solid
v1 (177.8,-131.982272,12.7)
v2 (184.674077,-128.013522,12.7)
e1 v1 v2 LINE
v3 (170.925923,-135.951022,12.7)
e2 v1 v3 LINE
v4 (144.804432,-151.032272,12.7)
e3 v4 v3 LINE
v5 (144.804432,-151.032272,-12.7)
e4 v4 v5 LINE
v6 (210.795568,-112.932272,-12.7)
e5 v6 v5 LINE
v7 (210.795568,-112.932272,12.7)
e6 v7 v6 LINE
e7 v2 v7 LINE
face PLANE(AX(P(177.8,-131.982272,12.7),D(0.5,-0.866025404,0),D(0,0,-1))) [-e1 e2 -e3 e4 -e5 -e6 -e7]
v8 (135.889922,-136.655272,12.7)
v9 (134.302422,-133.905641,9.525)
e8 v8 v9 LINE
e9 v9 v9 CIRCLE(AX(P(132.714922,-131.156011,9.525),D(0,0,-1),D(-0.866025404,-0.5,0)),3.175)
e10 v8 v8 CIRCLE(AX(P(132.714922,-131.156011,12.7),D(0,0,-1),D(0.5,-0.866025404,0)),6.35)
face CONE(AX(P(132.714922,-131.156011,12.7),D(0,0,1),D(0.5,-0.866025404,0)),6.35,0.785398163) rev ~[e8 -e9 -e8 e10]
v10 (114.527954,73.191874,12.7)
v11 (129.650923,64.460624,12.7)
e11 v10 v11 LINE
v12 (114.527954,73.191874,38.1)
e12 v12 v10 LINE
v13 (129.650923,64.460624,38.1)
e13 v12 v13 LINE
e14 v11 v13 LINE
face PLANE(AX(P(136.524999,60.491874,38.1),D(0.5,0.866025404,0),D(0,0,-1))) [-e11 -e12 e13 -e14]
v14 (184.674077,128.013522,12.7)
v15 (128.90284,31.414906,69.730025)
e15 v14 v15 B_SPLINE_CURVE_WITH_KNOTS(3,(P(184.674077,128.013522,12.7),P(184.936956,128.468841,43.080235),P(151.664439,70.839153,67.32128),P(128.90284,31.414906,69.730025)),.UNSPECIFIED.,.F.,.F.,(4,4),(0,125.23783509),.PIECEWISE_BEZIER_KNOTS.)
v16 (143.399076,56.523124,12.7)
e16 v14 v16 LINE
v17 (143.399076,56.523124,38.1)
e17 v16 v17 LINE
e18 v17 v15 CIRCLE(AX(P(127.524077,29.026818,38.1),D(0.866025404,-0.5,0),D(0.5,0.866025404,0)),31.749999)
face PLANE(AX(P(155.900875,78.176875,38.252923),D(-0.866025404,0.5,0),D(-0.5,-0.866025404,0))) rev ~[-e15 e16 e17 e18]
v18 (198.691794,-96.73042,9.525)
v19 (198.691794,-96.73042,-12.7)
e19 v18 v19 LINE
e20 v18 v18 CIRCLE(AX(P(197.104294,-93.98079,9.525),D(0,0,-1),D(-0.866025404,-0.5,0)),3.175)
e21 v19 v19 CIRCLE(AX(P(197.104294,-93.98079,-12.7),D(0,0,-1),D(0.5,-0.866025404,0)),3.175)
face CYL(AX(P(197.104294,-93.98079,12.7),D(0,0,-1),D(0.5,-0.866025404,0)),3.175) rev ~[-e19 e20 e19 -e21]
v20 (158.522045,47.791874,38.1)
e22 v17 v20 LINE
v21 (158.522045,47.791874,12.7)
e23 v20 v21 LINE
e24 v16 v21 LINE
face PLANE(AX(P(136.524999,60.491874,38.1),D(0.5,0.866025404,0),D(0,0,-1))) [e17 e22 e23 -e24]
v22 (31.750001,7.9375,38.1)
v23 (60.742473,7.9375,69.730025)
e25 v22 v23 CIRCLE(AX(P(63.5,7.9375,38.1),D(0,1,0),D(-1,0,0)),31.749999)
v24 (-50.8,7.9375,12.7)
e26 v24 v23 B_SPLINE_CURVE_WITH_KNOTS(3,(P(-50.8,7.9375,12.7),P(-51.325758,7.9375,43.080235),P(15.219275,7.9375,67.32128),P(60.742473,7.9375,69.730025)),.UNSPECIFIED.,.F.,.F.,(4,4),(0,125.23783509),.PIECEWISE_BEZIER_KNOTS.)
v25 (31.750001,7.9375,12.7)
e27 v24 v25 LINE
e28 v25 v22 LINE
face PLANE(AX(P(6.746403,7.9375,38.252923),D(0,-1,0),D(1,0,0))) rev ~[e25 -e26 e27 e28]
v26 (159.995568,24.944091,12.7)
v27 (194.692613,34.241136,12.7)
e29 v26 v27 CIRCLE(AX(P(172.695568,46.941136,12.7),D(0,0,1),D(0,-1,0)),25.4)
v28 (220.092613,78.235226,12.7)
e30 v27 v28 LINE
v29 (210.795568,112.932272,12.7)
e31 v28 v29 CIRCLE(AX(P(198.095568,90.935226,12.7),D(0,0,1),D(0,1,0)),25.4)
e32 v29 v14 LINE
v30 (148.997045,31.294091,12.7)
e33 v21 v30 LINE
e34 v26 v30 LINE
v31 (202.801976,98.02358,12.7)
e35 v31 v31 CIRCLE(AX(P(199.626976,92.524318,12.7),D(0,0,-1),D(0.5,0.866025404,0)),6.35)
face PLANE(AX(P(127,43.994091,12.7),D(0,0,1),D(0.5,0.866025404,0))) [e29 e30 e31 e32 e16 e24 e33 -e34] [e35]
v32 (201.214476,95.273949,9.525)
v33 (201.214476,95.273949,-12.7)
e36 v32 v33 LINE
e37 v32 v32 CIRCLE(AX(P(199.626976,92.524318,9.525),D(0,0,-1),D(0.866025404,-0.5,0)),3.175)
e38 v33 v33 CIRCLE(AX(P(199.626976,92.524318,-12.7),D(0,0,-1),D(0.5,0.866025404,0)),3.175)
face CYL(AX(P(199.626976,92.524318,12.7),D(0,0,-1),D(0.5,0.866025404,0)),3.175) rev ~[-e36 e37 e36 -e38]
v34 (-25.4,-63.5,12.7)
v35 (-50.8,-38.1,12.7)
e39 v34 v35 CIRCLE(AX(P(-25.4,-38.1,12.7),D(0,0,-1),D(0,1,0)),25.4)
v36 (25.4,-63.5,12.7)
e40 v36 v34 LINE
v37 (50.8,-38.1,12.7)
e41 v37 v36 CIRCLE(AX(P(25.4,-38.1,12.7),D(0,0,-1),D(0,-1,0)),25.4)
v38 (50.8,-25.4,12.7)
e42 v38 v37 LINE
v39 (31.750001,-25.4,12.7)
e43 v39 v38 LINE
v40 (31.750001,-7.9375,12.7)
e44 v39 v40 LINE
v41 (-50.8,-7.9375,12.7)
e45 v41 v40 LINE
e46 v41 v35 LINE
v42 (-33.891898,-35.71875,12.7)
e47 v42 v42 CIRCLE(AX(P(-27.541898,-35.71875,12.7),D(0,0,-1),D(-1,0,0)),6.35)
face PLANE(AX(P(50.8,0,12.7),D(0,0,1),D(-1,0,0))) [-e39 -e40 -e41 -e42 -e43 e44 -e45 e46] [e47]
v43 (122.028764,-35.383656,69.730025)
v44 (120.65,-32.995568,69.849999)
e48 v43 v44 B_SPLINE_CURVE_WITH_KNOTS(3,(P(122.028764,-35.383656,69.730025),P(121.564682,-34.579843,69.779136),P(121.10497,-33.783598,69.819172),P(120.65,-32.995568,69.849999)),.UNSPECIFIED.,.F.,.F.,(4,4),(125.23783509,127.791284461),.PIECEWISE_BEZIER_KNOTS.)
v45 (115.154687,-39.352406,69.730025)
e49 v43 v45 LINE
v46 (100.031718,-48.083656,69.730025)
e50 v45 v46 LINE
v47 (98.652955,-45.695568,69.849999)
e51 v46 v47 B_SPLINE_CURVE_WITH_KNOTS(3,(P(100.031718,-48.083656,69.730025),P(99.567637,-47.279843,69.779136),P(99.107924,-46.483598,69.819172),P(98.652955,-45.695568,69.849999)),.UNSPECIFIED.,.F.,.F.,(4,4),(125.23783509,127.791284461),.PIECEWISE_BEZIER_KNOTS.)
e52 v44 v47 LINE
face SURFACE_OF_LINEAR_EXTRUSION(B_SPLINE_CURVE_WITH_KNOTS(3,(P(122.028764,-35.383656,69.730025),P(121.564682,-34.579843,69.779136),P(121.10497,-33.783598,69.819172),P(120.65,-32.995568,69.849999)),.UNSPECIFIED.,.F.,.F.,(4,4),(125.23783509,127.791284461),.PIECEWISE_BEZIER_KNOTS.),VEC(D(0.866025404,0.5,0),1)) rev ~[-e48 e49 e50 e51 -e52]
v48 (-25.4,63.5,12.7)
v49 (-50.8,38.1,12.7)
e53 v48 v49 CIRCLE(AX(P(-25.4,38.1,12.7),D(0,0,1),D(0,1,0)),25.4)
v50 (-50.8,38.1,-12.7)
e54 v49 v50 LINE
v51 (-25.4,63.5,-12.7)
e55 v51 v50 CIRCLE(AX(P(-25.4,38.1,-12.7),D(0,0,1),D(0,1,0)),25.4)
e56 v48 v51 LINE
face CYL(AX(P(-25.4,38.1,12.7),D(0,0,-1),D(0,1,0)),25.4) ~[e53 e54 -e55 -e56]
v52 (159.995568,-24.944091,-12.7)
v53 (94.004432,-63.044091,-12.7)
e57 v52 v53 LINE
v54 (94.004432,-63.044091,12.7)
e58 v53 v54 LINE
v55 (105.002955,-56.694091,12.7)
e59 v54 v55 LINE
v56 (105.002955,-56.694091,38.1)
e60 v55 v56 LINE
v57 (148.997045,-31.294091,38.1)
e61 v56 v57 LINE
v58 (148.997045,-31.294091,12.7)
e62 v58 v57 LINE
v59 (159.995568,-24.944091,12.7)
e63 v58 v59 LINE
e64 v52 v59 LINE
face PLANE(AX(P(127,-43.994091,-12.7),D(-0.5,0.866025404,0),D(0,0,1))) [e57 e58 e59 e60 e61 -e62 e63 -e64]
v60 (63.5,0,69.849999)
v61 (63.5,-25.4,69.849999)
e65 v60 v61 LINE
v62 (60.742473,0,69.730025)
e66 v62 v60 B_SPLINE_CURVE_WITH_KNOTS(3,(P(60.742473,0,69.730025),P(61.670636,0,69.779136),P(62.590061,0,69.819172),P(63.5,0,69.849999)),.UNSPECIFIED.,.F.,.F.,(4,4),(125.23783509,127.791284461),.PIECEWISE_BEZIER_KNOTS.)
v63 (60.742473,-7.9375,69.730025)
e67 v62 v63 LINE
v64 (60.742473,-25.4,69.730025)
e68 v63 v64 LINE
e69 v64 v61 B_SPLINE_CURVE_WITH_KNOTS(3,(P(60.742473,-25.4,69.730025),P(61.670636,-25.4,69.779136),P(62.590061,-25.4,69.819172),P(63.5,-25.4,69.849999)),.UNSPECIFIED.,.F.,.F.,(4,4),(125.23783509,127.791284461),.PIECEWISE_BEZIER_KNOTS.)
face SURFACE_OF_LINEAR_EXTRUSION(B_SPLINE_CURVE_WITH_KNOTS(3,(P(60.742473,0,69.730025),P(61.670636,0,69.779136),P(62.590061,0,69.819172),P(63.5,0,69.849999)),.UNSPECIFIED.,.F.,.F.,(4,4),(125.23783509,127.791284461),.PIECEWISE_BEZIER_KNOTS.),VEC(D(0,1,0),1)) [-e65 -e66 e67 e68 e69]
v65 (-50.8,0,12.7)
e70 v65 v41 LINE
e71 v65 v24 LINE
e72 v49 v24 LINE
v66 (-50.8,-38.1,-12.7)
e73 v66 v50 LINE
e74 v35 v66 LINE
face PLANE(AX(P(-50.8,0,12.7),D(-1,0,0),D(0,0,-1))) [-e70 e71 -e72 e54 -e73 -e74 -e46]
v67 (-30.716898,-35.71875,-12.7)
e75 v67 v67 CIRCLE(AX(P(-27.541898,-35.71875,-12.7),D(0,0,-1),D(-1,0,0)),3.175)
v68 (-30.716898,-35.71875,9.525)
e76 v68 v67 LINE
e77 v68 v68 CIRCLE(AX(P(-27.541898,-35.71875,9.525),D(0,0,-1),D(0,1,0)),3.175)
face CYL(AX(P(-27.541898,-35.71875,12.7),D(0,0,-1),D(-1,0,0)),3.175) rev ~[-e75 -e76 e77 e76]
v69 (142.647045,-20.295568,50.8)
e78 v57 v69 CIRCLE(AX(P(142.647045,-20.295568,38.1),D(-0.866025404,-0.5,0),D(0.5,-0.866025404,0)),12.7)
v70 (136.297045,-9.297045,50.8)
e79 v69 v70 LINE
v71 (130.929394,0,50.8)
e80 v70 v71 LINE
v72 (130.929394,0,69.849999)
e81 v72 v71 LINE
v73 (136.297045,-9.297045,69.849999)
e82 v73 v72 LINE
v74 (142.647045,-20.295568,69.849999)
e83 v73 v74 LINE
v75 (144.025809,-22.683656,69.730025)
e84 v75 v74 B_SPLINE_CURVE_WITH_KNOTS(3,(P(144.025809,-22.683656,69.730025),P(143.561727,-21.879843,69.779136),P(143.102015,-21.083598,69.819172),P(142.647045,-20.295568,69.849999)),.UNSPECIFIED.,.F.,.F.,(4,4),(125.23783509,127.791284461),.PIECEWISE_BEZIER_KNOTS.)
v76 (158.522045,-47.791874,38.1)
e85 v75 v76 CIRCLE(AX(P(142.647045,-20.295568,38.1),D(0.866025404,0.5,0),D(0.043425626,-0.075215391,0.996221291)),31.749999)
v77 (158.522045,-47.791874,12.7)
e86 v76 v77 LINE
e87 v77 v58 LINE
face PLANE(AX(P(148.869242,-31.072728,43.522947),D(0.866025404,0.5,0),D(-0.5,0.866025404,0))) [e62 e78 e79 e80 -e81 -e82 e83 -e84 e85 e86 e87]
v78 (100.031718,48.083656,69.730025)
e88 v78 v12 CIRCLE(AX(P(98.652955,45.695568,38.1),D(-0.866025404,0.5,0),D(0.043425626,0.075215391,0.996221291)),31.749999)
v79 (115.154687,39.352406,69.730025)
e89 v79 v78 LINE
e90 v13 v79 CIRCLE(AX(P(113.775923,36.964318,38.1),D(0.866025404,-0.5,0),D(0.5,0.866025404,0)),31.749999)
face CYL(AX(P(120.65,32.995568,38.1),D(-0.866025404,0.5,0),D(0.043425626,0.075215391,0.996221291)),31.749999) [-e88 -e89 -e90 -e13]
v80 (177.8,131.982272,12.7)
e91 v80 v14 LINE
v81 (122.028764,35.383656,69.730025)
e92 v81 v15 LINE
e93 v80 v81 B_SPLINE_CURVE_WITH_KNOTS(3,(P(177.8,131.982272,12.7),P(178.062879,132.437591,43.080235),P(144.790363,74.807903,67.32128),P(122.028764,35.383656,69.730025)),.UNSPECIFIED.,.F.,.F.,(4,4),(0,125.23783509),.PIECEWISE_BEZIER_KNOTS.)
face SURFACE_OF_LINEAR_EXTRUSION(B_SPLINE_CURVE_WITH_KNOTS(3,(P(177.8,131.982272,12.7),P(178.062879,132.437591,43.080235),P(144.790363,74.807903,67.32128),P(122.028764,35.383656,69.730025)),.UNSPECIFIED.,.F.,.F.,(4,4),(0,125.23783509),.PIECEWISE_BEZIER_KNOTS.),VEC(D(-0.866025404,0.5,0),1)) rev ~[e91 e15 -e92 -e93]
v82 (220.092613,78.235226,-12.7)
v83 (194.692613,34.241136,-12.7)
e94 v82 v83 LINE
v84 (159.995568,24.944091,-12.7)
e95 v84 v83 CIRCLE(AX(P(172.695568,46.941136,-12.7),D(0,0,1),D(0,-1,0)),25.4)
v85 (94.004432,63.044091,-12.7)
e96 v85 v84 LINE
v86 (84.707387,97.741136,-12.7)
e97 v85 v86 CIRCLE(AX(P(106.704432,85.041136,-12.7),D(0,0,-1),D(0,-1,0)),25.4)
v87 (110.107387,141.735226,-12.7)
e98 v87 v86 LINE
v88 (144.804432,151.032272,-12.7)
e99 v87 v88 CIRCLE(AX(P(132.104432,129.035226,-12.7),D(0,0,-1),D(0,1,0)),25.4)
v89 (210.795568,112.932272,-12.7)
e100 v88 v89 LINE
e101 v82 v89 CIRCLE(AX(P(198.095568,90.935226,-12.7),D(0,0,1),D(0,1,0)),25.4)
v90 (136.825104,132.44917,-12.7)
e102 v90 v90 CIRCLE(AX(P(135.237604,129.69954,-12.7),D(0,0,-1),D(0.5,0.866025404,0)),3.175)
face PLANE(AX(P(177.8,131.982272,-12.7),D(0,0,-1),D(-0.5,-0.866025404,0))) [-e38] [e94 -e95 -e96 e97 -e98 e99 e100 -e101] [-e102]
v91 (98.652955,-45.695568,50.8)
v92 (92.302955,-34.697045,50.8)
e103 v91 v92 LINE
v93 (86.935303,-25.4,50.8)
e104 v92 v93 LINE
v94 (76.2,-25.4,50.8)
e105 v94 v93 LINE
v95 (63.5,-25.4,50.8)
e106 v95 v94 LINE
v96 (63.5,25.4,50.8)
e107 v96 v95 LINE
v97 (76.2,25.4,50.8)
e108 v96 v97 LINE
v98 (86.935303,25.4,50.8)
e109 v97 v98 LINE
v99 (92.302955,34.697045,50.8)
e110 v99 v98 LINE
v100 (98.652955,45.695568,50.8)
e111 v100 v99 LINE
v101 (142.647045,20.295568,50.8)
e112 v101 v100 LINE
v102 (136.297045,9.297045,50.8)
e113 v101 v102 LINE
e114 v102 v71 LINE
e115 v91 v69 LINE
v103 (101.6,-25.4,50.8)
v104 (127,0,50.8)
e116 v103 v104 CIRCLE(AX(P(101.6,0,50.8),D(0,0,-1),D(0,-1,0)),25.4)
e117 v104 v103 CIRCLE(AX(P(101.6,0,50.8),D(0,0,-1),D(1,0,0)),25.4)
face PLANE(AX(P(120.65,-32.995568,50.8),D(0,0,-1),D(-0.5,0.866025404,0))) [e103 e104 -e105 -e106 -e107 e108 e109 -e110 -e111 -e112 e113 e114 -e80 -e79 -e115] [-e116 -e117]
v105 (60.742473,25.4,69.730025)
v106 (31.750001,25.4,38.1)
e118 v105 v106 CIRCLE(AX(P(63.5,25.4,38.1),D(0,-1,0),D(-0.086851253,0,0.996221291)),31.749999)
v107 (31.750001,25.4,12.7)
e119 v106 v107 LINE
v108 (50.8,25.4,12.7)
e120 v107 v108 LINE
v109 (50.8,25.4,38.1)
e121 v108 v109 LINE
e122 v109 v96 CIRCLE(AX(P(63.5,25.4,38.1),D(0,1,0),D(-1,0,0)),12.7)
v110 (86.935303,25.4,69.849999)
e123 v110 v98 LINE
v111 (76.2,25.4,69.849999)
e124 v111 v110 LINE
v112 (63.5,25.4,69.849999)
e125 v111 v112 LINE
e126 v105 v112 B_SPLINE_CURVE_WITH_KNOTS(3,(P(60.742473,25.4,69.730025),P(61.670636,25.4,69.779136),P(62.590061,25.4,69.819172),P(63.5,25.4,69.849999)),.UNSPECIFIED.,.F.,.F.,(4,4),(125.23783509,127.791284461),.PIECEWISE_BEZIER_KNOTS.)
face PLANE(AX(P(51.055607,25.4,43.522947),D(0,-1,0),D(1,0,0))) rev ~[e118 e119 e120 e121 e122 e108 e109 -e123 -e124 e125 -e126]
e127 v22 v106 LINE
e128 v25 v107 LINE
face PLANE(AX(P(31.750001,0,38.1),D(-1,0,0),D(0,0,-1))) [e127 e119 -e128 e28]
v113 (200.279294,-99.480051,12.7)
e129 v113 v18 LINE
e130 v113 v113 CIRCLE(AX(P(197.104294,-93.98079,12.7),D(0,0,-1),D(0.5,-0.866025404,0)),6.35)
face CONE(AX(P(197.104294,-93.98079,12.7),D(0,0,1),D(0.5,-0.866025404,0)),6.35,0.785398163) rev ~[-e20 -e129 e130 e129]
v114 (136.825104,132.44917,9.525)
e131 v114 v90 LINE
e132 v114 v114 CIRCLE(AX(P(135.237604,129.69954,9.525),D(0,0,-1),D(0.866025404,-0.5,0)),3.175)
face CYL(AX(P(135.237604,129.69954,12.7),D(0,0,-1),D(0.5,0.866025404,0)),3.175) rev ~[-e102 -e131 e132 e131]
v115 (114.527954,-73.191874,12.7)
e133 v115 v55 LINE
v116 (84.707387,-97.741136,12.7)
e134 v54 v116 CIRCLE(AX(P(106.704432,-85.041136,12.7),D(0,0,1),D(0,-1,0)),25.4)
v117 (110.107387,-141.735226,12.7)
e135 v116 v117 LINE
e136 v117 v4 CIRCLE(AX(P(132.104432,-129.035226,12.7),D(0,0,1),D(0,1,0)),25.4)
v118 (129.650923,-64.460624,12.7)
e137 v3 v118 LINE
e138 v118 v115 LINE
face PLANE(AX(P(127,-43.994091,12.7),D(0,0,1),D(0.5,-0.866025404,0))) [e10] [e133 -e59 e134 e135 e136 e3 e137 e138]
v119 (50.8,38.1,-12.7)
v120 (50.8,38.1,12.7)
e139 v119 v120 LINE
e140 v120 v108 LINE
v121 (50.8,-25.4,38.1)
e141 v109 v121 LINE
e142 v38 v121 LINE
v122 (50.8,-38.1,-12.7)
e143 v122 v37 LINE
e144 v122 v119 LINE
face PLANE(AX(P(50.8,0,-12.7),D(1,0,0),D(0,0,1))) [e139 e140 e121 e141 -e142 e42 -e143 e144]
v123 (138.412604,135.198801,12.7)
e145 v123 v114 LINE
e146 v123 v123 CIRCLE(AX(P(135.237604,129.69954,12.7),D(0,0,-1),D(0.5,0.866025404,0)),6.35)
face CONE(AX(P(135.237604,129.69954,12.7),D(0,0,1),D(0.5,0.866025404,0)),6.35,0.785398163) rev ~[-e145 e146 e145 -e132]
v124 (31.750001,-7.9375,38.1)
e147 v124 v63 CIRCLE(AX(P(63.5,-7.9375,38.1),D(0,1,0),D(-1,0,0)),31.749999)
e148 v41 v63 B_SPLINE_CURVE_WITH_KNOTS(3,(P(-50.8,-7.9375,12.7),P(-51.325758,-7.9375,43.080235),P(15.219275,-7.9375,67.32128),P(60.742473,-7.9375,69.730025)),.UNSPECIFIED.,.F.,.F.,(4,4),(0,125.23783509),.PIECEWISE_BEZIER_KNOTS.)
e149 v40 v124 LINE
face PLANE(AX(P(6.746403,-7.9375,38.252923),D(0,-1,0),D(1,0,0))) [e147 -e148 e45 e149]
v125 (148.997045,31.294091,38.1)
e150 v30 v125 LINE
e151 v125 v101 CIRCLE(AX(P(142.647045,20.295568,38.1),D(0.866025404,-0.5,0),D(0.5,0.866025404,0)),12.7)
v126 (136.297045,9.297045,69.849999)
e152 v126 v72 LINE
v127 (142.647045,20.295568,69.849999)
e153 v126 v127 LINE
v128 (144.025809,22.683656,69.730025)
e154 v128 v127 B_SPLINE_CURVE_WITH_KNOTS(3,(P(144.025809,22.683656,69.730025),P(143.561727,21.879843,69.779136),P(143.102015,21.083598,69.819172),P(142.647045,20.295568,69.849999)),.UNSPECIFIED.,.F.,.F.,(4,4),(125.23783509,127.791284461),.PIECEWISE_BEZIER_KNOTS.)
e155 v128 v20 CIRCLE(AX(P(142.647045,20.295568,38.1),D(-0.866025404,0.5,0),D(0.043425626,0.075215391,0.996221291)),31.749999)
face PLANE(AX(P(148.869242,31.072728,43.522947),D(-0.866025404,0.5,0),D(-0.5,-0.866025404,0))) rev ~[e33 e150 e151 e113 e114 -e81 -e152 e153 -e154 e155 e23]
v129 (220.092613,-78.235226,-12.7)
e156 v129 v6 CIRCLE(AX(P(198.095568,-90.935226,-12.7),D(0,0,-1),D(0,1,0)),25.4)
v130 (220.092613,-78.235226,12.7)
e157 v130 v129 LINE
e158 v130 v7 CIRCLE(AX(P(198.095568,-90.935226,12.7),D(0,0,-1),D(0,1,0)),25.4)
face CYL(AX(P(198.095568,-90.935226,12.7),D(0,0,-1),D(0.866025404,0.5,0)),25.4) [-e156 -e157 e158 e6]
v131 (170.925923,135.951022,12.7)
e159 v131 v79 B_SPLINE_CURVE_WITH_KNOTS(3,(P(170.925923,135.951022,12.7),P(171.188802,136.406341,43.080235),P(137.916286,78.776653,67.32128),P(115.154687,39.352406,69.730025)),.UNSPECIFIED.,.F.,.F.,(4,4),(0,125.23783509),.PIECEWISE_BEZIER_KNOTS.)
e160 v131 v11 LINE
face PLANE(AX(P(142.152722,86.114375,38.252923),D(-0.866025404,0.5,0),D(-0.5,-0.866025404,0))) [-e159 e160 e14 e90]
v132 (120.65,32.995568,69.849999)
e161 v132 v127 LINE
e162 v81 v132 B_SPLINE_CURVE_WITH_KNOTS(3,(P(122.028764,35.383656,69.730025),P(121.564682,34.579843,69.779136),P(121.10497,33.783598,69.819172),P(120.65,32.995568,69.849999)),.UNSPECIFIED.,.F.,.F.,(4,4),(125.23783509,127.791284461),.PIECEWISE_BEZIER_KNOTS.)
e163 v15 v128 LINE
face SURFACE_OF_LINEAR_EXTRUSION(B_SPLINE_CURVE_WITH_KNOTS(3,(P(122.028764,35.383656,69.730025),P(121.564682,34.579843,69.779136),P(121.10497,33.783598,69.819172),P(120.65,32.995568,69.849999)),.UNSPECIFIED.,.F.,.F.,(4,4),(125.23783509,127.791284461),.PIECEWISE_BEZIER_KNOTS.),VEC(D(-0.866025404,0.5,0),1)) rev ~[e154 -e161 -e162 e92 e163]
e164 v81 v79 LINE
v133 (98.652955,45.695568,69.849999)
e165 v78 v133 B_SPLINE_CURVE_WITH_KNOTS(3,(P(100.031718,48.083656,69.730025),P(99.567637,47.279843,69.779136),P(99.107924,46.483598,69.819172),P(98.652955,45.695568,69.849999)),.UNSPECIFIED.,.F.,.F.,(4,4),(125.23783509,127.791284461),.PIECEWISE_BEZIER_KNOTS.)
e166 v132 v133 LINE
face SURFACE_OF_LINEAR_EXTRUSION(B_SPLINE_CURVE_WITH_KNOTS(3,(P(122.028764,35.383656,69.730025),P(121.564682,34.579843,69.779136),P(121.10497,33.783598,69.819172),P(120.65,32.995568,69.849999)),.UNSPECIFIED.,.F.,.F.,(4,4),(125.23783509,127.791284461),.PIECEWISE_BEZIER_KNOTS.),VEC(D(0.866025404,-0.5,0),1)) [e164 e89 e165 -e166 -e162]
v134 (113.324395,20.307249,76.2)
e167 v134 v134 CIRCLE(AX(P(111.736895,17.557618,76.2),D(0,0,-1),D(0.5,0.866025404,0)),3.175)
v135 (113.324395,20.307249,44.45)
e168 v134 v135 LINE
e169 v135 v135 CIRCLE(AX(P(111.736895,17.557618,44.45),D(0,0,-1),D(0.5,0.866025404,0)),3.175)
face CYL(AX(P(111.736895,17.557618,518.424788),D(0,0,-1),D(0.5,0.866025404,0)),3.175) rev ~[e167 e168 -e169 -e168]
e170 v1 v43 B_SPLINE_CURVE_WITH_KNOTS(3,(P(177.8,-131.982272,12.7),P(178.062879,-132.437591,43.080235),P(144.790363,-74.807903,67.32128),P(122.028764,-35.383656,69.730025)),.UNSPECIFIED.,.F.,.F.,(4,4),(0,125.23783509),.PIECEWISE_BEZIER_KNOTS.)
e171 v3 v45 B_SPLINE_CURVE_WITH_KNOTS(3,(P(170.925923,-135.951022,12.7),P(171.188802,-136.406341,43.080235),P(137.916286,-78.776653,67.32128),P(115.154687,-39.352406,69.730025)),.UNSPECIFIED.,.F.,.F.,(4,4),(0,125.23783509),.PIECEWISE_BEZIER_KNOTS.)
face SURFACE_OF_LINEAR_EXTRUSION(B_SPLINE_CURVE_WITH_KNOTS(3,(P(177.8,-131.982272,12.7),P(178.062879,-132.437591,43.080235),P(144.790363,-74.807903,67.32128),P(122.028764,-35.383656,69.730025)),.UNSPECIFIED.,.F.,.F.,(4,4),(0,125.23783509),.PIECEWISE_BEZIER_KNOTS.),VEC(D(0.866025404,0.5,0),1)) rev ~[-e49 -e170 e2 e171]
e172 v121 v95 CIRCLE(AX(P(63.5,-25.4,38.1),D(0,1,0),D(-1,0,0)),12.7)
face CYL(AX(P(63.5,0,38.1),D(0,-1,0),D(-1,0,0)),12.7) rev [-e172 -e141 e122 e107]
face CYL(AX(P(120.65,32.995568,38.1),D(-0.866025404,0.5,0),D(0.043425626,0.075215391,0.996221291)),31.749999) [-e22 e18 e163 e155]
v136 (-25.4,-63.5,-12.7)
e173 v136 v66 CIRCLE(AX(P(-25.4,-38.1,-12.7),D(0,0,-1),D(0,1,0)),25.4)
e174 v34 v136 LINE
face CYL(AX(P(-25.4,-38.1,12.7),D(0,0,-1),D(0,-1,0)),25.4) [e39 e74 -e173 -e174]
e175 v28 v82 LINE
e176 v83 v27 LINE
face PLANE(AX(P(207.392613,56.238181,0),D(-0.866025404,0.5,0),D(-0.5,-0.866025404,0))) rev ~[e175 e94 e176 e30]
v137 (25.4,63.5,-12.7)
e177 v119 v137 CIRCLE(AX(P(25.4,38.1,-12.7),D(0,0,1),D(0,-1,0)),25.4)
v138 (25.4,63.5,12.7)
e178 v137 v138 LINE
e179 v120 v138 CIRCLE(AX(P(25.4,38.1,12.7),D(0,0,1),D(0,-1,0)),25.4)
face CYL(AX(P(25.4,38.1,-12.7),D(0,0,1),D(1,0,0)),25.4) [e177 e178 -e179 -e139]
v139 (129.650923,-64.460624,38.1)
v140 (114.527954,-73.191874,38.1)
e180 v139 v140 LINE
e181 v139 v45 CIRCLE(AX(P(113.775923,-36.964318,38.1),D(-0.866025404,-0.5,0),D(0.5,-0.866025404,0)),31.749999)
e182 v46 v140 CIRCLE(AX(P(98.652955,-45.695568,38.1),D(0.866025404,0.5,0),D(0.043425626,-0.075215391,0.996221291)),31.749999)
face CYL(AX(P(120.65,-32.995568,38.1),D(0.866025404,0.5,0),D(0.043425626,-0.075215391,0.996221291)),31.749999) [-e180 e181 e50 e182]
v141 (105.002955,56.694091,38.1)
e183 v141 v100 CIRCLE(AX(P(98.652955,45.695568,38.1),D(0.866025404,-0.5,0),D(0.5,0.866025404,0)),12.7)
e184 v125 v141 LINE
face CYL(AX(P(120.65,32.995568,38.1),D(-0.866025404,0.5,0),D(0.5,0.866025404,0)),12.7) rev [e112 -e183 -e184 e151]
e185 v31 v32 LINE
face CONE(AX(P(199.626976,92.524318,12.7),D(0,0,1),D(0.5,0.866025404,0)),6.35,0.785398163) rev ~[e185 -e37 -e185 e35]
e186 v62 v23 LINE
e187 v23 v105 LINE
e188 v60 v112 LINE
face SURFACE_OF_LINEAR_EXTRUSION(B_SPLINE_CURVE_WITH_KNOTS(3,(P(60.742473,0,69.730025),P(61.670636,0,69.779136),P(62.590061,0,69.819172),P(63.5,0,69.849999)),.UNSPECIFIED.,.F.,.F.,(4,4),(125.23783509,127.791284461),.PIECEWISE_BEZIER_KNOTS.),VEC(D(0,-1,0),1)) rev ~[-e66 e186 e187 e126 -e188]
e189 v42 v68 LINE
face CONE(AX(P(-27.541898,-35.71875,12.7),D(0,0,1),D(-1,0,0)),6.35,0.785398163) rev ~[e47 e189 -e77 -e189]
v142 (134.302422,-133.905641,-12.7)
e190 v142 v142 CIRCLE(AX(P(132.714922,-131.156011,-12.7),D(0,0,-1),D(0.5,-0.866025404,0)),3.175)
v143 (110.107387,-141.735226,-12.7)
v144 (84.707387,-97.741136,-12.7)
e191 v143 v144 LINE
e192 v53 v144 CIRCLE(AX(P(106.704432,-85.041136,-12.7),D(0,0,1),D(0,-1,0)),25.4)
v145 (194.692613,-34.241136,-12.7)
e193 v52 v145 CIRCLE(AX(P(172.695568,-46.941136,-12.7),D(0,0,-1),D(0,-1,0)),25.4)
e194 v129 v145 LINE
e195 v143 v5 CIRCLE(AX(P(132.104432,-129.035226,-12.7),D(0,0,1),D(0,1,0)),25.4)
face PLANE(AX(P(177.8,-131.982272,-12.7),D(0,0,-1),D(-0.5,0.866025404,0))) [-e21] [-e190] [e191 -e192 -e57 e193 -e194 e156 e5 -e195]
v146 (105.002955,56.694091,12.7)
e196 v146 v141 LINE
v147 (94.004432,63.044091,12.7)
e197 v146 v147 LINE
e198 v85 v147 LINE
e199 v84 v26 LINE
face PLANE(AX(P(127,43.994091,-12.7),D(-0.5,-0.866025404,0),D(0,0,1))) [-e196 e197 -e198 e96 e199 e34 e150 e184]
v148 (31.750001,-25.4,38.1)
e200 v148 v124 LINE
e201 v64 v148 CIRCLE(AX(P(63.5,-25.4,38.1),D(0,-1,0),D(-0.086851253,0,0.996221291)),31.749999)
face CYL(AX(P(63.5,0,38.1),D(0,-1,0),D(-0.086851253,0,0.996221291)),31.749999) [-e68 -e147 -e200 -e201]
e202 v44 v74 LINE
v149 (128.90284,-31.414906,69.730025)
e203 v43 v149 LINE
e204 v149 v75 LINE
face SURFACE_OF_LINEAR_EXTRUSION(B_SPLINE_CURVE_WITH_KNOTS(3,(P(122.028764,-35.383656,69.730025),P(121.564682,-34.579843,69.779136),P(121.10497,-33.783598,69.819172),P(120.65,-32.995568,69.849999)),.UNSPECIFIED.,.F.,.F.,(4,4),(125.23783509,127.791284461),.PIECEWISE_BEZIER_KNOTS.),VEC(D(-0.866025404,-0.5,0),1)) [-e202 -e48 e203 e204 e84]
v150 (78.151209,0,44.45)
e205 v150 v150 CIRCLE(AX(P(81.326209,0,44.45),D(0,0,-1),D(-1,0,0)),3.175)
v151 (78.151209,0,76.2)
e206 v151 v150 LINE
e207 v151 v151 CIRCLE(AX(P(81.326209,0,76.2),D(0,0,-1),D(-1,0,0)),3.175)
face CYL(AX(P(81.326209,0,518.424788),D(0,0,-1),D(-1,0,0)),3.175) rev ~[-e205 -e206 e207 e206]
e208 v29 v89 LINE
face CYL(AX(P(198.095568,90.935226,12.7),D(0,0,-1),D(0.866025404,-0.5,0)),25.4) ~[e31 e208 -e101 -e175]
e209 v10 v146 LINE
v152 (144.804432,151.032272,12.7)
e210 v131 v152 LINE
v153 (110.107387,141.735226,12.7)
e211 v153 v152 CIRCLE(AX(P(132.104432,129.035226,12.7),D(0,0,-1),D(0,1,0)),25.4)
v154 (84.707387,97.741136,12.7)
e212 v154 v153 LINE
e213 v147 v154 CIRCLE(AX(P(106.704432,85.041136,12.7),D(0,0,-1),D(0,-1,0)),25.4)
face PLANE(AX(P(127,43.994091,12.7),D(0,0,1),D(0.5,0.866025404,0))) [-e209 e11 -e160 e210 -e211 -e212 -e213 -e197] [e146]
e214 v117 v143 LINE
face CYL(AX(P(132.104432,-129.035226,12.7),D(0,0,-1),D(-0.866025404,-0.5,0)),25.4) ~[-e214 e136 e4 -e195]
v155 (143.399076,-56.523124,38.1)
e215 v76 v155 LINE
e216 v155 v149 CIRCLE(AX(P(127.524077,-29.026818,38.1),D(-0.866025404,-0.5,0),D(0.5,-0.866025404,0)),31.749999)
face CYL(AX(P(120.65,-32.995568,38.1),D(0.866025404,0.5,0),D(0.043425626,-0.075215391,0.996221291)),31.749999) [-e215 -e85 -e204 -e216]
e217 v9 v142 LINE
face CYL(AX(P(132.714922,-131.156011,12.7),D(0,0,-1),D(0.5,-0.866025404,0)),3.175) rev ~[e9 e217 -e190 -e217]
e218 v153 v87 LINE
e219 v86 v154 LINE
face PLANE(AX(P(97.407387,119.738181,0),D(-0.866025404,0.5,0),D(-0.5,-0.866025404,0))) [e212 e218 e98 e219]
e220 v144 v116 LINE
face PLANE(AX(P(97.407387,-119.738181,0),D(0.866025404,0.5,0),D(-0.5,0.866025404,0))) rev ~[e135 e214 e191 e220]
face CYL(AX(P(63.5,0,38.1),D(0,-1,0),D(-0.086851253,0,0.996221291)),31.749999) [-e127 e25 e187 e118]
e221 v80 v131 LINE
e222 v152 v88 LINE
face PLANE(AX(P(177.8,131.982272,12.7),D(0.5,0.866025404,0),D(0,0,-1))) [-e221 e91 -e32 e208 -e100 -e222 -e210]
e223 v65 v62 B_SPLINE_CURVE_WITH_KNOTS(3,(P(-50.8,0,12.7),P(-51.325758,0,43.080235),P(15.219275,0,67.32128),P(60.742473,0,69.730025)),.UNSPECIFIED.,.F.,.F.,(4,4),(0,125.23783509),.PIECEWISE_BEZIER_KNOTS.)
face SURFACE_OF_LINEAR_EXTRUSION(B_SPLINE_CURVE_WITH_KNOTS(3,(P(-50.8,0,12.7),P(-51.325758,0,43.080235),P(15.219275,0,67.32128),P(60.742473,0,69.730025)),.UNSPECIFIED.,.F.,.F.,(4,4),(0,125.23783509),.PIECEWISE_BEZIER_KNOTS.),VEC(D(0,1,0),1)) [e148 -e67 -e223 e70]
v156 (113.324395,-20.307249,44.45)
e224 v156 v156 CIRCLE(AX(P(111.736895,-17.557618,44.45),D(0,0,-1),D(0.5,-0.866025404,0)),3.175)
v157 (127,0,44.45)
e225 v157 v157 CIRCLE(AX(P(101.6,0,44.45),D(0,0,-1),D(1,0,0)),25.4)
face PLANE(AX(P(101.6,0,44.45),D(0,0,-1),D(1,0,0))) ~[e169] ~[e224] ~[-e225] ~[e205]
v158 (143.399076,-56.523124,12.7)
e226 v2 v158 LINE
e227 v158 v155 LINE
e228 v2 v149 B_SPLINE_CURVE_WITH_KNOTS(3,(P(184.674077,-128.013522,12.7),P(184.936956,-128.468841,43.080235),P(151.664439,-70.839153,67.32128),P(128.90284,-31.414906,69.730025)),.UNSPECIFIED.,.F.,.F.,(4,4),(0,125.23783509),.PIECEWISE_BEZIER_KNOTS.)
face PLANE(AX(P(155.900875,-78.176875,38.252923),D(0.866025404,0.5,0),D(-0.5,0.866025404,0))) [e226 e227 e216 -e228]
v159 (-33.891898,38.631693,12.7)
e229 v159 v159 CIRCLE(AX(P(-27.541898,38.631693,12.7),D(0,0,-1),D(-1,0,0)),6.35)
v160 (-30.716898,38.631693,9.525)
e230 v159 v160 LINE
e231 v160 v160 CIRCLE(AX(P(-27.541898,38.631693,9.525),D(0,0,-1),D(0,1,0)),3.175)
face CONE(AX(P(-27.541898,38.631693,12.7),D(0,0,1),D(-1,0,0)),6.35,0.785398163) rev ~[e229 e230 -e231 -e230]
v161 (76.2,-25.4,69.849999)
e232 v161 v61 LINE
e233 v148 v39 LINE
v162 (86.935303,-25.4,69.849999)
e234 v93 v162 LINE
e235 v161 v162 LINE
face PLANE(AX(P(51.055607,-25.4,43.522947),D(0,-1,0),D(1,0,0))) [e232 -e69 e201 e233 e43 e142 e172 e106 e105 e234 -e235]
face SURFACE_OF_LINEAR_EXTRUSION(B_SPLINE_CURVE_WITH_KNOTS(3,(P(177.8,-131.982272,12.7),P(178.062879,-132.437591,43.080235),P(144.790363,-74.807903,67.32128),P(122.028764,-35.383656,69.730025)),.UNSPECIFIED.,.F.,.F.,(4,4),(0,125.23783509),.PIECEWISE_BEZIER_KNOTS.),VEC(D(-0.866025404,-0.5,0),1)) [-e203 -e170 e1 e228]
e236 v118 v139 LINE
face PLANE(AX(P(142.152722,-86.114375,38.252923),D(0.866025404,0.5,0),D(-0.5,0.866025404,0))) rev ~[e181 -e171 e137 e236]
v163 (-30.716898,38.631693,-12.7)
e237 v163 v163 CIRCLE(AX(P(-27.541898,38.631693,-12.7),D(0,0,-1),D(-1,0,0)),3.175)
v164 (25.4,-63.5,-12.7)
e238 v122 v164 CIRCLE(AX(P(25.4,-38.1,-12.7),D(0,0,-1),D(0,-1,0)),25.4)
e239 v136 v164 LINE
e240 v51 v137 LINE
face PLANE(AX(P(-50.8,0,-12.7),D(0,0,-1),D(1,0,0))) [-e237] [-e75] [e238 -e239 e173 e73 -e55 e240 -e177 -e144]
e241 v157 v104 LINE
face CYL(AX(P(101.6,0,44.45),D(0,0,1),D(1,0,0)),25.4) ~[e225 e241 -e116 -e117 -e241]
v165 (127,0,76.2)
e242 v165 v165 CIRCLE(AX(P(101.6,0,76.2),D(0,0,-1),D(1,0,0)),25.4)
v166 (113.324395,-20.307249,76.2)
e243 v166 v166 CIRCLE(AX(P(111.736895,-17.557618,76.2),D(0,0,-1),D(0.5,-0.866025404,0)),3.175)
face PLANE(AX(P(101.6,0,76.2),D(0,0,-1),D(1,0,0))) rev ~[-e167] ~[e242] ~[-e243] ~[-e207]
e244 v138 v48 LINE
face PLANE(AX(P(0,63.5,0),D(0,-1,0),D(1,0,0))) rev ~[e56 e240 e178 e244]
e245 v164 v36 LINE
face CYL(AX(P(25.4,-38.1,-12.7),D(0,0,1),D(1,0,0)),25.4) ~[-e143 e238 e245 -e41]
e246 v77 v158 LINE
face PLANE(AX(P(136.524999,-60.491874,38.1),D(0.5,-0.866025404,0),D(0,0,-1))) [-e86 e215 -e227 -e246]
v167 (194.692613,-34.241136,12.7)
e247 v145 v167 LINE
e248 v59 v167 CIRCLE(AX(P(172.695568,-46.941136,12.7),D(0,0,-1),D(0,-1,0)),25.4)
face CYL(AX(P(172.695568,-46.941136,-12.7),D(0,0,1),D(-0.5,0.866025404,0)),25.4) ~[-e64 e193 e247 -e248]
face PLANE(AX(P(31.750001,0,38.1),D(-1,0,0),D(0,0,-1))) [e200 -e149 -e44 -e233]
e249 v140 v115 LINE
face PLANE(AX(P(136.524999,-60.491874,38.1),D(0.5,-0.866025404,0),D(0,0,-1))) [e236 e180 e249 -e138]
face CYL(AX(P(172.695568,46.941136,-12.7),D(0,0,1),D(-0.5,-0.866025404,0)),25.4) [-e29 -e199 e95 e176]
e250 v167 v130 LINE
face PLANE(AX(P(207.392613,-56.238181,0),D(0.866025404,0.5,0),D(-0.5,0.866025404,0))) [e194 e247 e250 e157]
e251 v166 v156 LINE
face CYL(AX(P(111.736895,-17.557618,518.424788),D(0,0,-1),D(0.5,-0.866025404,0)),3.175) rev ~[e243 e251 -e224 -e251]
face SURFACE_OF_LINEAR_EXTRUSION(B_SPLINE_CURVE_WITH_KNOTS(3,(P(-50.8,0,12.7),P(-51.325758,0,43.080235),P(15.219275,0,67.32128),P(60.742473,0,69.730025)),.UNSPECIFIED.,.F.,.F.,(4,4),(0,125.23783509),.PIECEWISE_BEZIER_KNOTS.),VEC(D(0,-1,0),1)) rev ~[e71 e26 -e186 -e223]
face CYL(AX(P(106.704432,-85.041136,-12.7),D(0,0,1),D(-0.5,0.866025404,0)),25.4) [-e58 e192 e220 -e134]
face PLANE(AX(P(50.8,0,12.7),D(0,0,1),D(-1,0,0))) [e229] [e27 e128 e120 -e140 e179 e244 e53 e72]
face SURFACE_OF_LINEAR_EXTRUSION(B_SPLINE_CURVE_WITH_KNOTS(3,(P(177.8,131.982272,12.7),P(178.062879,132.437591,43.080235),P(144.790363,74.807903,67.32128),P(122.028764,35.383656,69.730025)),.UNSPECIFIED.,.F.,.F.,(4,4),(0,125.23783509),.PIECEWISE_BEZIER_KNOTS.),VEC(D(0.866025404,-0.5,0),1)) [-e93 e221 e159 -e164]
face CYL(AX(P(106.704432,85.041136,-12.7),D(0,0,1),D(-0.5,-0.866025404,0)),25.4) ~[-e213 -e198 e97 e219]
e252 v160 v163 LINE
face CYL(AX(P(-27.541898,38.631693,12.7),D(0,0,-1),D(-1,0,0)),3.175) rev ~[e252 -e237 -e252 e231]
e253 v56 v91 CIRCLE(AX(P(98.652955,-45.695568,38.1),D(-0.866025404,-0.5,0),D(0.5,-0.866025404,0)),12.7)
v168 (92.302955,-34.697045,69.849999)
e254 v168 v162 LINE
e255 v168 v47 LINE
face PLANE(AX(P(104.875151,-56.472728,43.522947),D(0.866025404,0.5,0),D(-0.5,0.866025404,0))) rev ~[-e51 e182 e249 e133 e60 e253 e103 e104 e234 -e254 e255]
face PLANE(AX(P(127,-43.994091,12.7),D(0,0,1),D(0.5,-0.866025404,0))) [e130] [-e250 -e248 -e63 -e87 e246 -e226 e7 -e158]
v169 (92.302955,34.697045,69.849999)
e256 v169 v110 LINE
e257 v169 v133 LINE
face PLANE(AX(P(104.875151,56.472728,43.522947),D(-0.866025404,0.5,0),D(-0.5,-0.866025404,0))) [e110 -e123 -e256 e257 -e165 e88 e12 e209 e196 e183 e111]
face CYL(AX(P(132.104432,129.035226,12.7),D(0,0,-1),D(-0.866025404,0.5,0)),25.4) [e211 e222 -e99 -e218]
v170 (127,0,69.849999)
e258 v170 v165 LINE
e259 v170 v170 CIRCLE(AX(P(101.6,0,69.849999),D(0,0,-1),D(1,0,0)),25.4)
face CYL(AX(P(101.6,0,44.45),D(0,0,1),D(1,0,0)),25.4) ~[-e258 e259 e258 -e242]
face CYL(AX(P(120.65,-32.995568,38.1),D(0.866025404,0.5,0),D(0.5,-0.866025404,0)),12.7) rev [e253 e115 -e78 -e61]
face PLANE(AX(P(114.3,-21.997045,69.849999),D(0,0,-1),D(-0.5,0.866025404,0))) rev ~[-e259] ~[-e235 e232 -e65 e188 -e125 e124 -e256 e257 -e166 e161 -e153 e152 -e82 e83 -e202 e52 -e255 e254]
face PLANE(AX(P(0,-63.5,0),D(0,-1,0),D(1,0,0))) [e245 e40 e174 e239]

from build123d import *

# Parameters (mm, degrees)
F1_DEPTH        = 63.5
F0_W            = 25.4
F0_H            = 19.0499989867
F2_DEPTH        = 25.4
F3_DEPTH        = 7.9375
F6_D            = 6.35
F6_CSINK_D      = 12.7
F6_CSINK_ANGLE  = 90
F7_COUNT        = 3
F9_D            = 6.35
F9_COPIES_COUNT = 3
F10_R           = 25.4


# Not quite as in the source:
# - a pattern or mirror of a feature is missing from the dataset's text; its kind, count and spacing are read off the source's solid


with BuildPart() as f1:
    # F0 (on Front) → F1 (new body, symmetric)
    with BuildSketch(Plane.XZ):
        Polygon((50.8, -12.7), (50.8, 12.7), (31.7500010133, 12.7), (-50.8, 12.7), (-50.8, -12.7), align=None)
    extrude(amount=F1_DEPTH, both=True)

    # F0 (on Front) → F2 (join, symmetric)
    with BuildSketch(Plane.XZ):
        with BuildLine():
            Line((31.7500010133, 12.7), (50.8, 12.7))
            Line((50.8, 12.7), (50.8, 38.1))
            ThreePointArc((50.8, 38.1), (54.5197438789, 47.0802561211), (63.5, 50.8))
            Line((63.5, 50.8), (76.2, 50.8))
            Line((76.2, 50.8), (76.2, 69.8499989867))
            Line((76.2, 69.8499989867), (63.5, 69.8499989867))
            add(Edge.make_bspline(
                [(60.7424728123, 69.7300249678), (61.6706362679, 69.7791364012), (62.5900608791, 69.8191720775), (63.5, 69.8499989867)],
                knots=[125.2378350903, 125.2378350903, 125.2378350903, 125.2378350903, 127.791284461, 127.791284461, 127.791284461, 127.791284461], degree=3))
            ThreePointArc((60.7424728123, 69.7300249678), (40.0947236603, 59.5535655573), (31.7500010133, 38.1))
            Line((31.7500010133, 38.1), (31.7500010133, 12.7))
        make_face()
        with Locations((88.9, 60.3249994934)):
            Rectangle(F0_W, F0_H)
    extrude(amount=F2_DEPTH, both=True)

    # F0 (on Front) → F3 (join, symmetric)
    with BuildSketch(Plane.XZ):
        with BuildLine():
            Line((-50.8, 12.7), (31.7500010133, 12.7))
            Line((31.7500010133, 12.7), (31.7500010133, 38.1))
            ThreePointArc((31.7500010133, 38.1), (40.0947236603, 59.5535655573), (60.7424728123, 69.7300249678))
            add(Edge.make_bspline(
                [(-50.8, 12.7), (-51.3257578554, 43.0802353164), (15.219274615, 67.3212795022), (60.7424728123, 69.7300249678)],
                knots=[0, 0, 0, 0, 125.2378350903, 125.2378350903, 125.2378350903, 125.2378350903], degree=3))
        make_face()
    extrude(amount=F3_DEPTH, both=True)

    # F0 (on Front) → F4 (revolve)
    with BuildSketch(Plane.XZ):
        Polygon((101.6, 69.8499989867), (101.6, 50.8), (101.6, 44.45), (127, 44.45), (127, 76.2), (101.6, 76.2), align=None)
    revolve(axis=Axis((101.6, 0, 60.325), (0, 0, -1)))

    # F6 (through all)
    with Locations(Plane.XY.offset(12.7)):
        with Locations((-27.541898191, -35.71875), (-27.541898191, 38.6316925287)):
            CounterSinkHole(F6_D / 2, F6_CSINK_D / 2, counter_sink_angle=F6_CSINK_ANGLE)

    # F7: F1 ×3 about axis
    f7_axis = Axis((101.6, 0, 60.325), (0, 0, -1))


with BuildPart() as f1_1:
    add(f1.part)
    for i in range(1, F7_COUNT):
        add(f1.part.rotate(f7_axis, i * 360 / F7_COUNT))

    # F9 (through all)
    with Locations(Plane.XY.offset(76.2)):
        with Locations((81.3262090087, 0)):
            f9 = Hole(F9_D / 2)

    # F9_copies: F9 ×3 about axis
    f9_copies_axis = Axis((101.6, 0, 0), (0, 0, 1))
    for i in range(1, F9_COPIES_COUNT):
        add(f9.rotate(f9_copies_axis, i * 360 / F9_COPIES_COUNT), mode=Mode.SUBTRACT)

    # F10
    f10_edges = [f1_1.edges().sort_by_distance(p)[0] for p in [
        (-50.8, -63.5, 0),
        (122.807387, -163.732272, 0),
        (232.792613, -100.232272, 0),
        (232.792613, 100.232272, 0),
        (181.992613, 12.244091, 0),
        (181.992613, -12.244091, 0),
        (50.8, -63.5, 0),
        (122.807387, 163.732272, 0),
        (72.007387, 75.744091, 0),
        (72.007387, -75.744091, 0),
        (50.8, 63.5, 0),
        (-50.8, 63.5, 0),
    ]]
    fillet(f10_edges, radius=F10_R)


solid = f1_1.part
